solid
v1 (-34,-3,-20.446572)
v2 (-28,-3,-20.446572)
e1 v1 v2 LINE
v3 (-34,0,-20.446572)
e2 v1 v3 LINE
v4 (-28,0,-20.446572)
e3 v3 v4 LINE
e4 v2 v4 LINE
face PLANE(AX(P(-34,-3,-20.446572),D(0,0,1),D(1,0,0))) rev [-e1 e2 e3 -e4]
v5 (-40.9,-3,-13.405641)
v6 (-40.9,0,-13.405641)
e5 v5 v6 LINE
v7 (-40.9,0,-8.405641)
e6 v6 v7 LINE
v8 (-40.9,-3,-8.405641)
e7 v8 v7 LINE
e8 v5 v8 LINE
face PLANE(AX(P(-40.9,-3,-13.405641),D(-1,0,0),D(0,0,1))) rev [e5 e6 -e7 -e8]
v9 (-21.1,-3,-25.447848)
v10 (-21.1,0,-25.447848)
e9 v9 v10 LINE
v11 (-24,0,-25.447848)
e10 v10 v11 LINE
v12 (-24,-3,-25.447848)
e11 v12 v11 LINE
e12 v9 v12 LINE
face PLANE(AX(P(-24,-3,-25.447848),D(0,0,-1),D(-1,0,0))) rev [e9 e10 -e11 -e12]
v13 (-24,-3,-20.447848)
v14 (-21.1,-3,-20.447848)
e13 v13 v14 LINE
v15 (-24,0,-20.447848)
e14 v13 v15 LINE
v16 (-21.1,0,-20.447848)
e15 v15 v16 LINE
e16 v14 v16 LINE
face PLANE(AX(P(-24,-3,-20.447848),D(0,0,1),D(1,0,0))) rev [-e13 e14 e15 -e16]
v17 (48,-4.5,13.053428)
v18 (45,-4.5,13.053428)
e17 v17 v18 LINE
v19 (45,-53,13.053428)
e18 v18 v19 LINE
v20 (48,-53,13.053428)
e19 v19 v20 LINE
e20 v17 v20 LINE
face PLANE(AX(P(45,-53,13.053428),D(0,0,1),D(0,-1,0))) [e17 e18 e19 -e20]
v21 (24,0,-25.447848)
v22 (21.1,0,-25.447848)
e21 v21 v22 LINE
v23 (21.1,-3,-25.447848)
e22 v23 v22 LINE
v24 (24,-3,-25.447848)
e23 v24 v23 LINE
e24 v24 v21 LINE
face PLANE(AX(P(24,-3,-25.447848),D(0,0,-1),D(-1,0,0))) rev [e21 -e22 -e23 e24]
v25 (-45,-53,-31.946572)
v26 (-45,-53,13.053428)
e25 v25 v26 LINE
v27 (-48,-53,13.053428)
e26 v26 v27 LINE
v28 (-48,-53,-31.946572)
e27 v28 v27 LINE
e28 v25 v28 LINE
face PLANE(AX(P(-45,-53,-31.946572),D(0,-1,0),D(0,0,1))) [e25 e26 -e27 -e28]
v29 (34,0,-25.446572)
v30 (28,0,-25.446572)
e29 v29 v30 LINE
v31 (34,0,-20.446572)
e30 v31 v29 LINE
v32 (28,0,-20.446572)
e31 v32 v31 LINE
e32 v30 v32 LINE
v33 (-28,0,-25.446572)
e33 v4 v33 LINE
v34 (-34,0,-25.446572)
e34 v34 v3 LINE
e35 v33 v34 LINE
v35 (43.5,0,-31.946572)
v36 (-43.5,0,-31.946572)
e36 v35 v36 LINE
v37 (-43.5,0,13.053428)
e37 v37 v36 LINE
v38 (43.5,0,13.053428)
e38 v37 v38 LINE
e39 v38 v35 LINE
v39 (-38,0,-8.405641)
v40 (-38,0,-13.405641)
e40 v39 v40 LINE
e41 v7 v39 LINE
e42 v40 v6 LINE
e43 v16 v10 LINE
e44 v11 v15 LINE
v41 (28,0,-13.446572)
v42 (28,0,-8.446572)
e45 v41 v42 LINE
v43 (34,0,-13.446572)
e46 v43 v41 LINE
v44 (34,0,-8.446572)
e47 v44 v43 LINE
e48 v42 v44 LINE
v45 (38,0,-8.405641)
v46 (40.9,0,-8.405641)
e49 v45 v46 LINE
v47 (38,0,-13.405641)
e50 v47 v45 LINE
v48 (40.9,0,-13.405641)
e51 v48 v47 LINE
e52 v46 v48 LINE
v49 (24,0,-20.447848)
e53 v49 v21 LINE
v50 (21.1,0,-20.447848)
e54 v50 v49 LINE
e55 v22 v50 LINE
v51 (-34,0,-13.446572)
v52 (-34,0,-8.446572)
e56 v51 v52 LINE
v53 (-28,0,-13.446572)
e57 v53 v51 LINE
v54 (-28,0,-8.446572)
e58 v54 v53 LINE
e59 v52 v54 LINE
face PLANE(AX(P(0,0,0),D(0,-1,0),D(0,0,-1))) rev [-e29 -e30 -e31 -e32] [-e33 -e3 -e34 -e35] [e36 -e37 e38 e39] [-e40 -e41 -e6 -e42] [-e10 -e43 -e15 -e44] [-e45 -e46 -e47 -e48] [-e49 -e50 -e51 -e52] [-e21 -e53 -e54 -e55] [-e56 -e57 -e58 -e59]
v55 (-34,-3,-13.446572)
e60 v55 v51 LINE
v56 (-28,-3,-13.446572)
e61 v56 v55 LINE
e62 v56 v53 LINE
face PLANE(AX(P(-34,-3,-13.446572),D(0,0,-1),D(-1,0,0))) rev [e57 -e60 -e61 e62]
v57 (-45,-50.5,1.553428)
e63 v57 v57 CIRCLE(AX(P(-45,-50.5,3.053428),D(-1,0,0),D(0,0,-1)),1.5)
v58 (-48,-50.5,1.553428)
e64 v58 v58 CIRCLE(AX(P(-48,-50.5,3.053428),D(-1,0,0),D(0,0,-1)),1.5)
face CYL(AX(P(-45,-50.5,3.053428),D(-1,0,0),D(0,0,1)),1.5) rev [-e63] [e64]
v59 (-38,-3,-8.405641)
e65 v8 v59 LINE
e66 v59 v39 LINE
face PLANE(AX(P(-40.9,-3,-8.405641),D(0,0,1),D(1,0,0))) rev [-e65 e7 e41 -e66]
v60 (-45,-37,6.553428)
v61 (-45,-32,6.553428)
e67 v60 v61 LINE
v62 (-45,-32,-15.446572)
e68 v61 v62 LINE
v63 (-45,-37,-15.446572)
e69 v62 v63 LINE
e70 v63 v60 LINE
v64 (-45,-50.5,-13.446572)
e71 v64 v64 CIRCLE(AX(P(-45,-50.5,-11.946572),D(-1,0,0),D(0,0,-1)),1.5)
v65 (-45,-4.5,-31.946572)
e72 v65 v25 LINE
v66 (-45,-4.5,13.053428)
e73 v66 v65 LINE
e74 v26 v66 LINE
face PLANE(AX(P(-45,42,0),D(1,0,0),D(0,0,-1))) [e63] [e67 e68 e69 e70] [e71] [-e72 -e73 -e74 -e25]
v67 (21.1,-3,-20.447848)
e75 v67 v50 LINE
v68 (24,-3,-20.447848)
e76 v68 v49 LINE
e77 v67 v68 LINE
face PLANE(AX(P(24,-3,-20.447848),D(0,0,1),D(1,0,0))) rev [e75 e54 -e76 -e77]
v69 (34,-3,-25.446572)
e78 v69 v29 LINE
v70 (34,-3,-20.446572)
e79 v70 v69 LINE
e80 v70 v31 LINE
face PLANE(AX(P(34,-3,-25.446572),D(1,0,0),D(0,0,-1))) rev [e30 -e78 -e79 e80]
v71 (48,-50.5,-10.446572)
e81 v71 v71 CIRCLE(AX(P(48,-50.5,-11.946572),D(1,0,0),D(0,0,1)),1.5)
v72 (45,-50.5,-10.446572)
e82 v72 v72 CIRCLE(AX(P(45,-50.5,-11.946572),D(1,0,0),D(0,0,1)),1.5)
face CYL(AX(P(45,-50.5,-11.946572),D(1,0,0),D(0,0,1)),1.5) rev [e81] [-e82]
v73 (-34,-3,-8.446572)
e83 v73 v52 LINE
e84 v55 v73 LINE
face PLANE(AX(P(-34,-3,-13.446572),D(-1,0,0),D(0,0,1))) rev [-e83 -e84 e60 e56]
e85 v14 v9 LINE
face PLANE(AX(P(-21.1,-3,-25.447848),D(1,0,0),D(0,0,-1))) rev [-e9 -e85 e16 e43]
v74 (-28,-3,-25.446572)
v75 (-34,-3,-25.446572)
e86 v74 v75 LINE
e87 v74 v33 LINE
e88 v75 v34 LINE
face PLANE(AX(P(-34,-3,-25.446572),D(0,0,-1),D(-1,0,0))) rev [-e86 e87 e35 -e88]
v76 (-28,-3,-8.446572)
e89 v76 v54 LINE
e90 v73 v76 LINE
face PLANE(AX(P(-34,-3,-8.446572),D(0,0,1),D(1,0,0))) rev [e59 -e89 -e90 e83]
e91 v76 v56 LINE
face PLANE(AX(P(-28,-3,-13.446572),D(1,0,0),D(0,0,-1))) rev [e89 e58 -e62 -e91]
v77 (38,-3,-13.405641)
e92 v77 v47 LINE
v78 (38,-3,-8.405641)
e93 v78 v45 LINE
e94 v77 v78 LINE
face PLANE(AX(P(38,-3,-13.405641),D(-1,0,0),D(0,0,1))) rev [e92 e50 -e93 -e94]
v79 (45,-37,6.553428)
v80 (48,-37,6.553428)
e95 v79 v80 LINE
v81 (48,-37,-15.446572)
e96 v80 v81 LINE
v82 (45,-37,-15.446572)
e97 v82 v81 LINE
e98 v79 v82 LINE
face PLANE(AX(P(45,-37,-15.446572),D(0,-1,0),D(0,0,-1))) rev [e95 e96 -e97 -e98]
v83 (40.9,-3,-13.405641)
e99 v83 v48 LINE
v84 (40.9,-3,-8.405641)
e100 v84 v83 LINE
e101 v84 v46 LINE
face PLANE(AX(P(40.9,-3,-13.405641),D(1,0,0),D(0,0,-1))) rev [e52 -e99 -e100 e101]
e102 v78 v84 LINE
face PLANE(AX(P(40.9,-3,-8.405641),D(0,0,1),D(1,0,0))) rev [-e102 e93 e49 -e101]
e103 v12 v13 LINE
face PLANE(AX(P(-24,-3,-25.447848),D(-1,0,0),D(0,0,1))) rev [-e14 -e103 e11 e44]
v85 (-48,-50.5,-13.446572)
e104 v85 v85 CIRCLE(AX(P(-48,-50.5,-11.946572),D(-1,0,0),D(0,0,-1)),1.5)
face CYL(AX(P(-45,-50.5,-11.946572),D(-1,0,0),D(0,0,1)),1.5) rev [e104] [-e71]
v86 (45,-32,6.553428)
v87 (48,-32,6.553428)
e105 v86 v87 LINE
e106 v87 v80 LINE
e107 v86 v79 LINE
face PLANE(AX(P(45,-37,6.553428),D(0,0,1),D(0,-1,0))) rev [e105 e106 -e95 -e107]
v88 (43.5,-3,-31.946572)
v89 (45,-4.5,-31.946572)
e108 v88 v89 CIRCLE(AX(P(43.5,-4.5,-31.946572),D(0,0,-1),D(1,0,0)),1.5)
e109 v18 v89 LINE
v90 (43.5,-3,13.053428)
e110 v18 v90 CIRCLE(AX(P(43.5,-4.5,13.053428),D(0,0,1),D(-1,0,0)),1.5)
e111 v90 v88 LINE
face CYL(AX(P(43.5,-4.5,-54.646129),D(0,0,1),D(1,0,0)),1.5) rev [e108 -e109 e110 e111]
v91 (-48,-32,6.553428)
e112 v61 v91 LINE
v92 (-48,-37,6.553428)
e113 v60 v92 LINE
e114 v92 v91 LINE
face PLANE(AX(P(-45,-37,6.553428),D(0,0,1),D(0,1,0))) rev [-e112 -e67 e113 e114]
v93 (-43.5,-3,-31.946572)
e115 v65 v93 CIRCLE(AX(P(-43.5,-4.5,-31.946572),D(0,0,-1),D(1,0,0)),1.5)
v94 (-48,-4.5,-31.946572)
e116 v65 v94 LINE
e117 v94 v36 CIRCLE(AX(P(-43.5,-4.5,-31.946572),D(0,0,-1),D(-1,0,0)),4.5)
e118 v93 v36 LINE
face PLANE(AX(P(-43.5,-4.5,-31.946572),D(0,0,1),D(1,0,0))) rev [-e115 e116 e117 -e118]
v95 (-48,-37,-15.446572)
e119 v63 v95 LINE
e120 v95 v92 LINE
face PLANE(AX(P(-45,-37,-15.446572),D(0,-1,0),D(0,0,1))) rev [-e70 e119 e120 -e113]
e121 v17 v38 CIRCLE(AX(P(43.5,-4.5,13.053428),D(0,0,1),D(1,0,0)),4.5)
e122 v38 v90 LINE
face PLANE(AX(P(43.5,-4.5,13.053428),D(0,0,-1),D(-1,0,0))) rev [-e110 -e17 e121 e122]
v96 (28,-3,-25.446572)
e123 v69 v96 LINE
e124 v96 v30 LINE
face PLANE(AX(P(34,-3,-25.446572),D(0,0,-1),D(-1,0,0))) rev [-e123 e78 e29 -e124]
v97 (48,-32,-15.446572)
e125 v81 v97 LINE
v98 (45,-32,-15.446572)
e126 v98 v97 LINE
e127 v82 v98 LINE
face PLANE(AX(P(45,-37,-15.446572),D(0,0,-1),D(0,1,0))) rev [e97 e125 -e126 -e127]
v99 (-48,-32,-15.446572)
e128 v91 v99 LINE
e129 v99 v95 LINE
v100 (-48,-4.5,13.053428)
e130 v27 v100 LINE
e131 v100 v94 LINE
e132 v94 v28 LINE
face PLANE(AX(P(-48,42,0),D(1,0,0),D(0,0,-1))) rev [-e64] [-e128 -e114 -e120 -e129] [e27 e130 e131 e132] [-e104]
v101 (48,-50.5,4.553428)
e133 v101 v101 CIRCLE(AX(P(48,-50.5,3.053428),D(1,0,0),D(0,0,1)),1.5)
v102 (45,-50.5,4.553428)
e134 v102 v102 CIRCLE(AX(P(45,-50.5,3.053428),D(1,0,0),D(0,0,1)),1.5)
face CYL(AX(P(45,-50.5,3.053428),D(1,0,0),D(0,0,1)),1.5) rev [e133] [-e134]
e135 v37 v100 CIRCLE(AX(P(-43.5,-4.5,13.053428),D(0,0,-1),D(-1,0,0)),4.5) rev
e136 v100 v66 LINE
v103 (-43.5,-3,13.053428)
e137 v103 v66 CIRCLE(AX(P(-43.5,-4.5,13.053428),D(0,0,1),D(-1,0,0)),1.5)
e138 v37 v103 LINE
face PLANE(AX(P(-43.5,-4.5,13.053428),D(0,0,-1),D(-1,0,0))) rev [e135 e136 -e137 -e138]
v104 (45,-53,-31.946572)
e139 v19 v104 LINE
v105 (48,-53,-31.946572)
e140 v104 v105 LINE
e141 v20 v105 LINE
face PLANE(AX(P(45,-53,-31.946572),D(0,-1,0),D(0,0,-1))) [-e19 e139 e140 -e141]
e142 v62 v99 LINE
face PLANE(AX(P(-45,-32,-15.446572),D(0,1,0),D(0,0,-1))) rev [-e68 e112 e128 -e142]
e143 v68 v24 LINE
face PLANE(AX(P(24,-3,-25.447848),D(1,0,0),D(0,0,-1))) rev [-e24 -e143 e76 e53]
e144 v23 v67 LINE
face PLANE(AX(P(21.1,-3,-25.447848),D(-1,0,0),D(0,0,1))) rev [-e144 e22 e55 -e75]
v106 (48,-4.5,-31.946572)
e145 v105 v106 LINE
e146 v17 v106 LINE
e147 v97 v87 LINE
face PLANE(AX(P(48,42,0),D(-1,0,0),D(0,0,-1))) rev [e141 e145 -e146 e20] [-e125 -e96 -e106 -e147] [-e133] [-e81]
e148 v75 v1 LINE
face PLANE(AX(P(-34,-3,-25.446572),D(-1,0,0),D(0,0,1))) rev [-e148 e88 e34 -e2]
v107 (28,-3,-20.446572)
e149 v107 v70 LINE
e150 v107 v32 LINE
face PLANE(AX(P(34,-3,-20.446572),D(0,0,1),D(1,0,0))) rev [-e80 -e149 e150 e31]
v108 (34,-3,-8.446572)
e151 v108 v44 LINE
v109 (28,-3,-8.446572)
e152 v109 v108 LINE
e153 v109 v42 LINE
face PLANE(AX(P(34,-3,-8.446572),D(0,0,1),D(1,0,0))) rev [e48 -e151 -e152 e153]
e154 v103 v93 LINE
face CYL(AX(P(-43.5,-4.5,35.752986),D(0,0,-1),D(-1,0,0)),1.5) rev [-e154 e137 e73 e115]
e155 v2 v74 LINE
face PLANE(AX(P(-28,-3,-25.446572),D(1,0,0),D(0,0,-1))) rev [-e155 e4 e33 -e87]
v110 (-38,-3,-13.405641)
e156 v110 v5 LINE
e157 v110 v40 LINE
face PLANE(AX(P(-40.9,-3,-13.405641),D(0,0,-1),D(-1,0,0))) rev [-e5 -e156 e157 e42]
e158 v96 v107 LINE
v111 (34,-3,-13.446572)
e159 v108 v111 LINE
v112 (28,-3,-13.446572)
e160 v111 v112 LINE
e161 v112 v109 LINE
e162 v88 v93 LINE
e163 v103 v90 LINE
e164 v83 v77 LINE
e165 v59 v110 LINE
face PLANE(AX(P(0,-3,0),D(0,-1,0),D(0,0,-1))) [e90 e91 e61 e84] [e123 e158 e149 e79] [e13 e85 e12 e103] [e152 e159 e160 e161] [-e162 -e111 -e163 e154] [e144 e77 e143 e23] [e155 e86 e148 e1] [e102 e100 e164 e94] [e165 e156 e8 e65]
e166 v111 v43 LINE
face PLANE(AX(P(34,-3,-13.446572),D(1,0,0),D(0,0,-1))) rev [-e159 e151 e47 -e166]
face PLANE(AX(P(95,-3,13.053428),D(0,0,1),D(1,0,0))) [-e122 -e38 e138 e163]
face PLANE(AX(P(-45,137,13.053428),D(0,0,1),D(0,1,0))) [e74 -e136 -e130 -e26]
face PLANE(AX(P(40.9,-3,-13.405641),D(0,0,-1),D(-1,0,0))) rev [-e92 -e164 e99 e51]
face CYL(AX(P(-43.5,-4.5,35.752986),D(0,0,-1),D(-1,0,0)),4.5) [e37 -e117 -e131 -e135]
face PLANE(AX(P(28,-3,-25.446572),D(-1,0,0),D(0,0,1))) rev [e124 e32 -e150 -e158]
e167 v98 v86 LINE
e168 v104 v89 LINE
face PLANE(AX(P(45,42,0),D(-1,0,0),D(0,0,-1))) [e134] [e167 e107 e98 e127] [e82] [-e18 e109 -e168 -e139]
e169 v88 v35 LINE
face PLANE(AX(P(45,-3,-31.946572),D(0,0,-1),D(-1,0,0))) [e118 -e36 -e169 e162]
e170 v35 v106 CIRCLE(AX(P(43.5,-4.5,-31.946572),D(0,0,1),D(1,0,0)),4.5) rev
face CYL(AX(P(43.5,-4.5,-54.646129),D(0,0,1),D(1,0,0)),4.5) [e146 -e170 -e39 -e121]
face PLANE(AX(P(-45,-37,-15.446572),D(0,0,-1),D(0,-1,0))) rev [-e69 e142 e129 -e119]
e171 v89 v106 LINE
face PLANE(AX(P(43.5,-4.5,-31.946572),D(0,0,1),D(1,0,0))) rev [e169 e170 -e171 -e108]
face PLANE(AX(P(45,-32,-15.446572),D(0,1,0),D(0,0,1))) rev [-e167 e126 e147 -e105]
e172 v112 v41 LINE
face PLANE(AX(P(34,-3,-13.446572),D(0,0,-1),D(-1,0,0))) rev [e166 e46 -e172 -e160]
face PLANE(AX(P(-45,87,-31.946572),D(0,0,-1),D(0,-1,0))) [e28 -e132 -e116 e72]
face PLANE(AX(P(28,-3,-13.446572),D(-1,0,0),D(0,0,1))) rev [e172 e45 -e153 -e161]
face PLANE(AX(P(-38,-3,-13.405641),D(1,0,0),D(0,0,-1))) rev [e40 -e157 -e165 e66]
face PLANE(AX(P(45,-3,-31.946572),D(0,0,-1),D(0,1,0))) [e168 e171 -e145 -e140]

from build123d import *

# Parameters (mm, degrees)
SKETCH1_R                  = 1.5
SKETCH1_W                  = 2.9
SKETCH1_H                  = 5
SKETCH1_W_2                = 6
SKETCH1_W_3                = 5
SKETCH1_H_2                = 22
BASE_FLANGE1_DEPTH         = 3
SKETCHED_START             = -31.946571622
SKETCHED_BEND1_DEPTH       = 45
SKETCHED_BEND1_2_OUTLINE_W = 3
SKETCHED_BEND1_2_OUTLINE_H = 16
SKETCHED_BEND1_2_DEPTH     = 45
SKETCHED_BEND1_3_OUTLINE_W = 3
SKETCHED_BEND1_3_OUTLINE_H = 5
SKETCHED_BEND1_3_DEPTH     = 16.5
SKETCHED_START_2           = 6.553428378
SKETCHED_BEND1_4_OUTLINE_W = 3
SKETCHED_BEND1_4_OUTLINE_H = 5
SKETCHED_BEND1_4_DEPTH     = 6.5
SKETCHED_START_3           = -49
SKETCHED_BEND1_5_OUTLINE_R = 1.5
SKETCHED_BEND1_5_DEPTH     = 98


with BuildPart() as part:
    # Base-Flange1: sheet metal written as solids
    # Sketch1 → Base-Flange1 (new body)
    with BuildSketch(Plane(origin=(0, 0, 0), x_dir=(1, 0, 0), z_dir=(0, 1, 0))):
        Polygon((-95, 31.946571622), (-95, -13.053428378), (95, -13.053428378), (95, 31.946571622), (45, 31.946571622), (-45, 31.946571622), align=None)
        with Locations(Location((92.5, -3.053428378, 0), (0, 0, 270))):
            Circle(SKETCH1_R, mode=Mode.SUBTRACT)
        with Locations(Location((92.5, 11.946571622, 0), (0, 0, 270))):
            Circle(SKETCH1_R, mode=Mode.SUBTRACT)
        with Locations(Location((-92.5, -3.053428378, 0), (0, 0, 90))):
            Circle(SKETCH1_R, mode=Mode.SUBTRACT)
        with Locations(Location((-92.5, 11.946571622, 0), (0, 0, 90))):
            Circle(SKETCH1_R, mode=Mode.SUBTRACT)
        with Locations((-39.45, 10.905641405)):
            Rectangle(SKETCH1_W, SKETCH1_H, mode=Mode.SUBTRACT)
        with Locations((-22.55, 22.947848405)):
            Rectangle(SKETCH1_W, SKETCH1_H, mode=Mode.SUBTRACT)
        with Locations((-31, 22.946571622)):
            Rectangle(SKETCH1_W_2, SKETCH1_H, mode=Mode.SUBTRACT)
        with Locations((-31, 10.946571622)):
            Rectangle(SKETCH1_W_2, SKETCH1_H, mode=Mode.SUBTRACT)
        with Locations((31, 10.946571622)):
            Rectangle(SKETCH1_W_2, SKETCH1_H, mode=Mode.SUBTRACT)
        with Locations((31, 22.946571622)):
            Rectangle(SKETCH1_W_2, SKETCH1_H, mode=Mode.SUBTRACT)
        with Locations((22.55, 22.947848405)):
            Rectangle(SKETCH1_W, SKETCH1_H, mode=Mode.SUBTRACT)
        with Locations((39.45, 10.905641405)):
            Rectangle(SKETCH1_W, SKETCH1_H, mode=Mode.SUBTRACT)
        with Locations((76.5, 4.446571622)):
            Rectangle(SKETCH1_W_3, SKETCH1_H_2, mode=Mode.SUBTRACT)
        with Locations((-76.5, 4.446571622)):
            Rectangle(SKETCH1_W_3, SKETCH1_H_2, mode=Mode.SUBTRACT)
    extrude(amount=-BASE_FLANGE1_DEPTH)

    # Sketched Bend1: read off the stored shape, not the designer's step
    # Sketched Bend1 outline → Sketched Bend1 (cut)
    with BuildSketch(Plane.XY.offset(SKETCHED_START)):
        with BuildLine():
            ThreePointArc((43.5, 0), (46.098076211, -0.825765386), (47.742640687, -3))
            Line((47.742640687, -3), (95, -3))
            Line((95, -3), (95, 0))
            Line((95, 0), (43.5, 0))
        make_face()
        with BuildLine():
            ThreePointArc((-47.742640687, -3), (-46.098076211, -0.825765386), (-43.5, 0))
            Line((-43.5, 0), (-95, 0))
            Line((-95, 0), (-95, -3))
            Line((-95, -3), (-47.742640687, -3))
        make_face()
    extrude(amount=SKETCHED_BEND1_DEPTH, mode=Mode.SUBTRACT)

    # Sketched Bend1 2 outline → Sketched Bend1 2 (add)
    with BuildSketch(Plane.XY.offset(SKETCHED_START)):
        with BuildLine():
            ThreePointArc((43.5, -3), (44.560660172, -3.439339828), (45, -4.5))
            Line((45, -4.5), (45, -32))
            Line((45, -32), (48, -32))
            Line((48, -32), (48, -4.5))
            ThreePointArc((48, -4.5), (47.935193518, -3.739041096), (47.742640687, -3))
            Line((47.742640687, -3), (43.5, -3))
        make_face()
        with BuildLine():
            ThreePointArc((-45, -4.5), (-44.560660172, -3.439339828), (-43.5, -3))
            Line((-43.5, -3), (-47.742640687, -3))
            ThreePointArc((-47.742640687, -3), (-47.935193518, -3.739041096), (-48, -4.5))
            Line((-48, -4.5), (-48, -32))
            Line((-48, -32), (-45, -32))
            Line((-45, -32), (-45, -4.5))
        make_face()
        with Locations((46.5, -45)):
            Rectangle(SKETCHED_BEND1_2_OUTLINE_W, SKETCHED_BEND1_2_OUTLINE_H)
        with Locations((-46.5, -45)):
            Rectangle(SKETCHED_BEND1_2_OUTLINE_W, SKETCHED_BEND1_2_OUTLINE_H)
    extrude(amount=SKETCHED_BEND1_2_DEPTH)

    # Sketched Bend1 3 outline → Sketched Bend1 3 (add)
    with BuildSketch(Plane.XY.offset(SKETCHED_START)):
        with Locations((46.5, -34.5)):
            Rectangle(SKETCHED_BEND1_3_OUTLINE_W, SKETCHED_BEND1_3_OUTLINE_H)
        with Locations((-46.5, -34.5)):
            Rectangle(SKETCHED_BEND1_3_OUTLINE_W, SKETCHED_BEND1_3_OUTLINE_H)
    extrude(amount=SKETCHED_BEND1_3_DEPTH)

    # Sketched Bend1 4 outline → Sketched Bend1 4 (add)
    with BuildSketch(Plane.XY.offset(SKETCHED_START_2)):
        with Locations((46.5, -34.5)):
            Rectangle(SKETCHED_BEND1_4_OUTLINE_W, SKETCHED_BEND1_4_OUTLINE_H)
        with Locations((-46.5, -34.5)):
            Rectangle(SKETCHED_BEND1_4_OUTLINE_W, SKETCHED_BEND1_4_OUTLINE_H)
    extrude(amount=SKETCHED_BEND1_4_DEPTH)

    # Sketched Bend1 5 outline → Sketched Bend1 5 (cut)
    with BuildSketch(Plane.YZ.offset(SKETCHED_START_3)):
        with Locations((-50.5, -11.946571622)):
            Circle(SKETCHED_BEND1_5_OUTLINE_R)
        with Locations((-50.5, 3.053428378)):
            Circle(SKETCHED_BEND1_5_OUTLINE_R)
    extrude(amount=SKETCHED_BEND1_5_DEPTH, mode=Mode.SUBTRACT)


solid = part.part
